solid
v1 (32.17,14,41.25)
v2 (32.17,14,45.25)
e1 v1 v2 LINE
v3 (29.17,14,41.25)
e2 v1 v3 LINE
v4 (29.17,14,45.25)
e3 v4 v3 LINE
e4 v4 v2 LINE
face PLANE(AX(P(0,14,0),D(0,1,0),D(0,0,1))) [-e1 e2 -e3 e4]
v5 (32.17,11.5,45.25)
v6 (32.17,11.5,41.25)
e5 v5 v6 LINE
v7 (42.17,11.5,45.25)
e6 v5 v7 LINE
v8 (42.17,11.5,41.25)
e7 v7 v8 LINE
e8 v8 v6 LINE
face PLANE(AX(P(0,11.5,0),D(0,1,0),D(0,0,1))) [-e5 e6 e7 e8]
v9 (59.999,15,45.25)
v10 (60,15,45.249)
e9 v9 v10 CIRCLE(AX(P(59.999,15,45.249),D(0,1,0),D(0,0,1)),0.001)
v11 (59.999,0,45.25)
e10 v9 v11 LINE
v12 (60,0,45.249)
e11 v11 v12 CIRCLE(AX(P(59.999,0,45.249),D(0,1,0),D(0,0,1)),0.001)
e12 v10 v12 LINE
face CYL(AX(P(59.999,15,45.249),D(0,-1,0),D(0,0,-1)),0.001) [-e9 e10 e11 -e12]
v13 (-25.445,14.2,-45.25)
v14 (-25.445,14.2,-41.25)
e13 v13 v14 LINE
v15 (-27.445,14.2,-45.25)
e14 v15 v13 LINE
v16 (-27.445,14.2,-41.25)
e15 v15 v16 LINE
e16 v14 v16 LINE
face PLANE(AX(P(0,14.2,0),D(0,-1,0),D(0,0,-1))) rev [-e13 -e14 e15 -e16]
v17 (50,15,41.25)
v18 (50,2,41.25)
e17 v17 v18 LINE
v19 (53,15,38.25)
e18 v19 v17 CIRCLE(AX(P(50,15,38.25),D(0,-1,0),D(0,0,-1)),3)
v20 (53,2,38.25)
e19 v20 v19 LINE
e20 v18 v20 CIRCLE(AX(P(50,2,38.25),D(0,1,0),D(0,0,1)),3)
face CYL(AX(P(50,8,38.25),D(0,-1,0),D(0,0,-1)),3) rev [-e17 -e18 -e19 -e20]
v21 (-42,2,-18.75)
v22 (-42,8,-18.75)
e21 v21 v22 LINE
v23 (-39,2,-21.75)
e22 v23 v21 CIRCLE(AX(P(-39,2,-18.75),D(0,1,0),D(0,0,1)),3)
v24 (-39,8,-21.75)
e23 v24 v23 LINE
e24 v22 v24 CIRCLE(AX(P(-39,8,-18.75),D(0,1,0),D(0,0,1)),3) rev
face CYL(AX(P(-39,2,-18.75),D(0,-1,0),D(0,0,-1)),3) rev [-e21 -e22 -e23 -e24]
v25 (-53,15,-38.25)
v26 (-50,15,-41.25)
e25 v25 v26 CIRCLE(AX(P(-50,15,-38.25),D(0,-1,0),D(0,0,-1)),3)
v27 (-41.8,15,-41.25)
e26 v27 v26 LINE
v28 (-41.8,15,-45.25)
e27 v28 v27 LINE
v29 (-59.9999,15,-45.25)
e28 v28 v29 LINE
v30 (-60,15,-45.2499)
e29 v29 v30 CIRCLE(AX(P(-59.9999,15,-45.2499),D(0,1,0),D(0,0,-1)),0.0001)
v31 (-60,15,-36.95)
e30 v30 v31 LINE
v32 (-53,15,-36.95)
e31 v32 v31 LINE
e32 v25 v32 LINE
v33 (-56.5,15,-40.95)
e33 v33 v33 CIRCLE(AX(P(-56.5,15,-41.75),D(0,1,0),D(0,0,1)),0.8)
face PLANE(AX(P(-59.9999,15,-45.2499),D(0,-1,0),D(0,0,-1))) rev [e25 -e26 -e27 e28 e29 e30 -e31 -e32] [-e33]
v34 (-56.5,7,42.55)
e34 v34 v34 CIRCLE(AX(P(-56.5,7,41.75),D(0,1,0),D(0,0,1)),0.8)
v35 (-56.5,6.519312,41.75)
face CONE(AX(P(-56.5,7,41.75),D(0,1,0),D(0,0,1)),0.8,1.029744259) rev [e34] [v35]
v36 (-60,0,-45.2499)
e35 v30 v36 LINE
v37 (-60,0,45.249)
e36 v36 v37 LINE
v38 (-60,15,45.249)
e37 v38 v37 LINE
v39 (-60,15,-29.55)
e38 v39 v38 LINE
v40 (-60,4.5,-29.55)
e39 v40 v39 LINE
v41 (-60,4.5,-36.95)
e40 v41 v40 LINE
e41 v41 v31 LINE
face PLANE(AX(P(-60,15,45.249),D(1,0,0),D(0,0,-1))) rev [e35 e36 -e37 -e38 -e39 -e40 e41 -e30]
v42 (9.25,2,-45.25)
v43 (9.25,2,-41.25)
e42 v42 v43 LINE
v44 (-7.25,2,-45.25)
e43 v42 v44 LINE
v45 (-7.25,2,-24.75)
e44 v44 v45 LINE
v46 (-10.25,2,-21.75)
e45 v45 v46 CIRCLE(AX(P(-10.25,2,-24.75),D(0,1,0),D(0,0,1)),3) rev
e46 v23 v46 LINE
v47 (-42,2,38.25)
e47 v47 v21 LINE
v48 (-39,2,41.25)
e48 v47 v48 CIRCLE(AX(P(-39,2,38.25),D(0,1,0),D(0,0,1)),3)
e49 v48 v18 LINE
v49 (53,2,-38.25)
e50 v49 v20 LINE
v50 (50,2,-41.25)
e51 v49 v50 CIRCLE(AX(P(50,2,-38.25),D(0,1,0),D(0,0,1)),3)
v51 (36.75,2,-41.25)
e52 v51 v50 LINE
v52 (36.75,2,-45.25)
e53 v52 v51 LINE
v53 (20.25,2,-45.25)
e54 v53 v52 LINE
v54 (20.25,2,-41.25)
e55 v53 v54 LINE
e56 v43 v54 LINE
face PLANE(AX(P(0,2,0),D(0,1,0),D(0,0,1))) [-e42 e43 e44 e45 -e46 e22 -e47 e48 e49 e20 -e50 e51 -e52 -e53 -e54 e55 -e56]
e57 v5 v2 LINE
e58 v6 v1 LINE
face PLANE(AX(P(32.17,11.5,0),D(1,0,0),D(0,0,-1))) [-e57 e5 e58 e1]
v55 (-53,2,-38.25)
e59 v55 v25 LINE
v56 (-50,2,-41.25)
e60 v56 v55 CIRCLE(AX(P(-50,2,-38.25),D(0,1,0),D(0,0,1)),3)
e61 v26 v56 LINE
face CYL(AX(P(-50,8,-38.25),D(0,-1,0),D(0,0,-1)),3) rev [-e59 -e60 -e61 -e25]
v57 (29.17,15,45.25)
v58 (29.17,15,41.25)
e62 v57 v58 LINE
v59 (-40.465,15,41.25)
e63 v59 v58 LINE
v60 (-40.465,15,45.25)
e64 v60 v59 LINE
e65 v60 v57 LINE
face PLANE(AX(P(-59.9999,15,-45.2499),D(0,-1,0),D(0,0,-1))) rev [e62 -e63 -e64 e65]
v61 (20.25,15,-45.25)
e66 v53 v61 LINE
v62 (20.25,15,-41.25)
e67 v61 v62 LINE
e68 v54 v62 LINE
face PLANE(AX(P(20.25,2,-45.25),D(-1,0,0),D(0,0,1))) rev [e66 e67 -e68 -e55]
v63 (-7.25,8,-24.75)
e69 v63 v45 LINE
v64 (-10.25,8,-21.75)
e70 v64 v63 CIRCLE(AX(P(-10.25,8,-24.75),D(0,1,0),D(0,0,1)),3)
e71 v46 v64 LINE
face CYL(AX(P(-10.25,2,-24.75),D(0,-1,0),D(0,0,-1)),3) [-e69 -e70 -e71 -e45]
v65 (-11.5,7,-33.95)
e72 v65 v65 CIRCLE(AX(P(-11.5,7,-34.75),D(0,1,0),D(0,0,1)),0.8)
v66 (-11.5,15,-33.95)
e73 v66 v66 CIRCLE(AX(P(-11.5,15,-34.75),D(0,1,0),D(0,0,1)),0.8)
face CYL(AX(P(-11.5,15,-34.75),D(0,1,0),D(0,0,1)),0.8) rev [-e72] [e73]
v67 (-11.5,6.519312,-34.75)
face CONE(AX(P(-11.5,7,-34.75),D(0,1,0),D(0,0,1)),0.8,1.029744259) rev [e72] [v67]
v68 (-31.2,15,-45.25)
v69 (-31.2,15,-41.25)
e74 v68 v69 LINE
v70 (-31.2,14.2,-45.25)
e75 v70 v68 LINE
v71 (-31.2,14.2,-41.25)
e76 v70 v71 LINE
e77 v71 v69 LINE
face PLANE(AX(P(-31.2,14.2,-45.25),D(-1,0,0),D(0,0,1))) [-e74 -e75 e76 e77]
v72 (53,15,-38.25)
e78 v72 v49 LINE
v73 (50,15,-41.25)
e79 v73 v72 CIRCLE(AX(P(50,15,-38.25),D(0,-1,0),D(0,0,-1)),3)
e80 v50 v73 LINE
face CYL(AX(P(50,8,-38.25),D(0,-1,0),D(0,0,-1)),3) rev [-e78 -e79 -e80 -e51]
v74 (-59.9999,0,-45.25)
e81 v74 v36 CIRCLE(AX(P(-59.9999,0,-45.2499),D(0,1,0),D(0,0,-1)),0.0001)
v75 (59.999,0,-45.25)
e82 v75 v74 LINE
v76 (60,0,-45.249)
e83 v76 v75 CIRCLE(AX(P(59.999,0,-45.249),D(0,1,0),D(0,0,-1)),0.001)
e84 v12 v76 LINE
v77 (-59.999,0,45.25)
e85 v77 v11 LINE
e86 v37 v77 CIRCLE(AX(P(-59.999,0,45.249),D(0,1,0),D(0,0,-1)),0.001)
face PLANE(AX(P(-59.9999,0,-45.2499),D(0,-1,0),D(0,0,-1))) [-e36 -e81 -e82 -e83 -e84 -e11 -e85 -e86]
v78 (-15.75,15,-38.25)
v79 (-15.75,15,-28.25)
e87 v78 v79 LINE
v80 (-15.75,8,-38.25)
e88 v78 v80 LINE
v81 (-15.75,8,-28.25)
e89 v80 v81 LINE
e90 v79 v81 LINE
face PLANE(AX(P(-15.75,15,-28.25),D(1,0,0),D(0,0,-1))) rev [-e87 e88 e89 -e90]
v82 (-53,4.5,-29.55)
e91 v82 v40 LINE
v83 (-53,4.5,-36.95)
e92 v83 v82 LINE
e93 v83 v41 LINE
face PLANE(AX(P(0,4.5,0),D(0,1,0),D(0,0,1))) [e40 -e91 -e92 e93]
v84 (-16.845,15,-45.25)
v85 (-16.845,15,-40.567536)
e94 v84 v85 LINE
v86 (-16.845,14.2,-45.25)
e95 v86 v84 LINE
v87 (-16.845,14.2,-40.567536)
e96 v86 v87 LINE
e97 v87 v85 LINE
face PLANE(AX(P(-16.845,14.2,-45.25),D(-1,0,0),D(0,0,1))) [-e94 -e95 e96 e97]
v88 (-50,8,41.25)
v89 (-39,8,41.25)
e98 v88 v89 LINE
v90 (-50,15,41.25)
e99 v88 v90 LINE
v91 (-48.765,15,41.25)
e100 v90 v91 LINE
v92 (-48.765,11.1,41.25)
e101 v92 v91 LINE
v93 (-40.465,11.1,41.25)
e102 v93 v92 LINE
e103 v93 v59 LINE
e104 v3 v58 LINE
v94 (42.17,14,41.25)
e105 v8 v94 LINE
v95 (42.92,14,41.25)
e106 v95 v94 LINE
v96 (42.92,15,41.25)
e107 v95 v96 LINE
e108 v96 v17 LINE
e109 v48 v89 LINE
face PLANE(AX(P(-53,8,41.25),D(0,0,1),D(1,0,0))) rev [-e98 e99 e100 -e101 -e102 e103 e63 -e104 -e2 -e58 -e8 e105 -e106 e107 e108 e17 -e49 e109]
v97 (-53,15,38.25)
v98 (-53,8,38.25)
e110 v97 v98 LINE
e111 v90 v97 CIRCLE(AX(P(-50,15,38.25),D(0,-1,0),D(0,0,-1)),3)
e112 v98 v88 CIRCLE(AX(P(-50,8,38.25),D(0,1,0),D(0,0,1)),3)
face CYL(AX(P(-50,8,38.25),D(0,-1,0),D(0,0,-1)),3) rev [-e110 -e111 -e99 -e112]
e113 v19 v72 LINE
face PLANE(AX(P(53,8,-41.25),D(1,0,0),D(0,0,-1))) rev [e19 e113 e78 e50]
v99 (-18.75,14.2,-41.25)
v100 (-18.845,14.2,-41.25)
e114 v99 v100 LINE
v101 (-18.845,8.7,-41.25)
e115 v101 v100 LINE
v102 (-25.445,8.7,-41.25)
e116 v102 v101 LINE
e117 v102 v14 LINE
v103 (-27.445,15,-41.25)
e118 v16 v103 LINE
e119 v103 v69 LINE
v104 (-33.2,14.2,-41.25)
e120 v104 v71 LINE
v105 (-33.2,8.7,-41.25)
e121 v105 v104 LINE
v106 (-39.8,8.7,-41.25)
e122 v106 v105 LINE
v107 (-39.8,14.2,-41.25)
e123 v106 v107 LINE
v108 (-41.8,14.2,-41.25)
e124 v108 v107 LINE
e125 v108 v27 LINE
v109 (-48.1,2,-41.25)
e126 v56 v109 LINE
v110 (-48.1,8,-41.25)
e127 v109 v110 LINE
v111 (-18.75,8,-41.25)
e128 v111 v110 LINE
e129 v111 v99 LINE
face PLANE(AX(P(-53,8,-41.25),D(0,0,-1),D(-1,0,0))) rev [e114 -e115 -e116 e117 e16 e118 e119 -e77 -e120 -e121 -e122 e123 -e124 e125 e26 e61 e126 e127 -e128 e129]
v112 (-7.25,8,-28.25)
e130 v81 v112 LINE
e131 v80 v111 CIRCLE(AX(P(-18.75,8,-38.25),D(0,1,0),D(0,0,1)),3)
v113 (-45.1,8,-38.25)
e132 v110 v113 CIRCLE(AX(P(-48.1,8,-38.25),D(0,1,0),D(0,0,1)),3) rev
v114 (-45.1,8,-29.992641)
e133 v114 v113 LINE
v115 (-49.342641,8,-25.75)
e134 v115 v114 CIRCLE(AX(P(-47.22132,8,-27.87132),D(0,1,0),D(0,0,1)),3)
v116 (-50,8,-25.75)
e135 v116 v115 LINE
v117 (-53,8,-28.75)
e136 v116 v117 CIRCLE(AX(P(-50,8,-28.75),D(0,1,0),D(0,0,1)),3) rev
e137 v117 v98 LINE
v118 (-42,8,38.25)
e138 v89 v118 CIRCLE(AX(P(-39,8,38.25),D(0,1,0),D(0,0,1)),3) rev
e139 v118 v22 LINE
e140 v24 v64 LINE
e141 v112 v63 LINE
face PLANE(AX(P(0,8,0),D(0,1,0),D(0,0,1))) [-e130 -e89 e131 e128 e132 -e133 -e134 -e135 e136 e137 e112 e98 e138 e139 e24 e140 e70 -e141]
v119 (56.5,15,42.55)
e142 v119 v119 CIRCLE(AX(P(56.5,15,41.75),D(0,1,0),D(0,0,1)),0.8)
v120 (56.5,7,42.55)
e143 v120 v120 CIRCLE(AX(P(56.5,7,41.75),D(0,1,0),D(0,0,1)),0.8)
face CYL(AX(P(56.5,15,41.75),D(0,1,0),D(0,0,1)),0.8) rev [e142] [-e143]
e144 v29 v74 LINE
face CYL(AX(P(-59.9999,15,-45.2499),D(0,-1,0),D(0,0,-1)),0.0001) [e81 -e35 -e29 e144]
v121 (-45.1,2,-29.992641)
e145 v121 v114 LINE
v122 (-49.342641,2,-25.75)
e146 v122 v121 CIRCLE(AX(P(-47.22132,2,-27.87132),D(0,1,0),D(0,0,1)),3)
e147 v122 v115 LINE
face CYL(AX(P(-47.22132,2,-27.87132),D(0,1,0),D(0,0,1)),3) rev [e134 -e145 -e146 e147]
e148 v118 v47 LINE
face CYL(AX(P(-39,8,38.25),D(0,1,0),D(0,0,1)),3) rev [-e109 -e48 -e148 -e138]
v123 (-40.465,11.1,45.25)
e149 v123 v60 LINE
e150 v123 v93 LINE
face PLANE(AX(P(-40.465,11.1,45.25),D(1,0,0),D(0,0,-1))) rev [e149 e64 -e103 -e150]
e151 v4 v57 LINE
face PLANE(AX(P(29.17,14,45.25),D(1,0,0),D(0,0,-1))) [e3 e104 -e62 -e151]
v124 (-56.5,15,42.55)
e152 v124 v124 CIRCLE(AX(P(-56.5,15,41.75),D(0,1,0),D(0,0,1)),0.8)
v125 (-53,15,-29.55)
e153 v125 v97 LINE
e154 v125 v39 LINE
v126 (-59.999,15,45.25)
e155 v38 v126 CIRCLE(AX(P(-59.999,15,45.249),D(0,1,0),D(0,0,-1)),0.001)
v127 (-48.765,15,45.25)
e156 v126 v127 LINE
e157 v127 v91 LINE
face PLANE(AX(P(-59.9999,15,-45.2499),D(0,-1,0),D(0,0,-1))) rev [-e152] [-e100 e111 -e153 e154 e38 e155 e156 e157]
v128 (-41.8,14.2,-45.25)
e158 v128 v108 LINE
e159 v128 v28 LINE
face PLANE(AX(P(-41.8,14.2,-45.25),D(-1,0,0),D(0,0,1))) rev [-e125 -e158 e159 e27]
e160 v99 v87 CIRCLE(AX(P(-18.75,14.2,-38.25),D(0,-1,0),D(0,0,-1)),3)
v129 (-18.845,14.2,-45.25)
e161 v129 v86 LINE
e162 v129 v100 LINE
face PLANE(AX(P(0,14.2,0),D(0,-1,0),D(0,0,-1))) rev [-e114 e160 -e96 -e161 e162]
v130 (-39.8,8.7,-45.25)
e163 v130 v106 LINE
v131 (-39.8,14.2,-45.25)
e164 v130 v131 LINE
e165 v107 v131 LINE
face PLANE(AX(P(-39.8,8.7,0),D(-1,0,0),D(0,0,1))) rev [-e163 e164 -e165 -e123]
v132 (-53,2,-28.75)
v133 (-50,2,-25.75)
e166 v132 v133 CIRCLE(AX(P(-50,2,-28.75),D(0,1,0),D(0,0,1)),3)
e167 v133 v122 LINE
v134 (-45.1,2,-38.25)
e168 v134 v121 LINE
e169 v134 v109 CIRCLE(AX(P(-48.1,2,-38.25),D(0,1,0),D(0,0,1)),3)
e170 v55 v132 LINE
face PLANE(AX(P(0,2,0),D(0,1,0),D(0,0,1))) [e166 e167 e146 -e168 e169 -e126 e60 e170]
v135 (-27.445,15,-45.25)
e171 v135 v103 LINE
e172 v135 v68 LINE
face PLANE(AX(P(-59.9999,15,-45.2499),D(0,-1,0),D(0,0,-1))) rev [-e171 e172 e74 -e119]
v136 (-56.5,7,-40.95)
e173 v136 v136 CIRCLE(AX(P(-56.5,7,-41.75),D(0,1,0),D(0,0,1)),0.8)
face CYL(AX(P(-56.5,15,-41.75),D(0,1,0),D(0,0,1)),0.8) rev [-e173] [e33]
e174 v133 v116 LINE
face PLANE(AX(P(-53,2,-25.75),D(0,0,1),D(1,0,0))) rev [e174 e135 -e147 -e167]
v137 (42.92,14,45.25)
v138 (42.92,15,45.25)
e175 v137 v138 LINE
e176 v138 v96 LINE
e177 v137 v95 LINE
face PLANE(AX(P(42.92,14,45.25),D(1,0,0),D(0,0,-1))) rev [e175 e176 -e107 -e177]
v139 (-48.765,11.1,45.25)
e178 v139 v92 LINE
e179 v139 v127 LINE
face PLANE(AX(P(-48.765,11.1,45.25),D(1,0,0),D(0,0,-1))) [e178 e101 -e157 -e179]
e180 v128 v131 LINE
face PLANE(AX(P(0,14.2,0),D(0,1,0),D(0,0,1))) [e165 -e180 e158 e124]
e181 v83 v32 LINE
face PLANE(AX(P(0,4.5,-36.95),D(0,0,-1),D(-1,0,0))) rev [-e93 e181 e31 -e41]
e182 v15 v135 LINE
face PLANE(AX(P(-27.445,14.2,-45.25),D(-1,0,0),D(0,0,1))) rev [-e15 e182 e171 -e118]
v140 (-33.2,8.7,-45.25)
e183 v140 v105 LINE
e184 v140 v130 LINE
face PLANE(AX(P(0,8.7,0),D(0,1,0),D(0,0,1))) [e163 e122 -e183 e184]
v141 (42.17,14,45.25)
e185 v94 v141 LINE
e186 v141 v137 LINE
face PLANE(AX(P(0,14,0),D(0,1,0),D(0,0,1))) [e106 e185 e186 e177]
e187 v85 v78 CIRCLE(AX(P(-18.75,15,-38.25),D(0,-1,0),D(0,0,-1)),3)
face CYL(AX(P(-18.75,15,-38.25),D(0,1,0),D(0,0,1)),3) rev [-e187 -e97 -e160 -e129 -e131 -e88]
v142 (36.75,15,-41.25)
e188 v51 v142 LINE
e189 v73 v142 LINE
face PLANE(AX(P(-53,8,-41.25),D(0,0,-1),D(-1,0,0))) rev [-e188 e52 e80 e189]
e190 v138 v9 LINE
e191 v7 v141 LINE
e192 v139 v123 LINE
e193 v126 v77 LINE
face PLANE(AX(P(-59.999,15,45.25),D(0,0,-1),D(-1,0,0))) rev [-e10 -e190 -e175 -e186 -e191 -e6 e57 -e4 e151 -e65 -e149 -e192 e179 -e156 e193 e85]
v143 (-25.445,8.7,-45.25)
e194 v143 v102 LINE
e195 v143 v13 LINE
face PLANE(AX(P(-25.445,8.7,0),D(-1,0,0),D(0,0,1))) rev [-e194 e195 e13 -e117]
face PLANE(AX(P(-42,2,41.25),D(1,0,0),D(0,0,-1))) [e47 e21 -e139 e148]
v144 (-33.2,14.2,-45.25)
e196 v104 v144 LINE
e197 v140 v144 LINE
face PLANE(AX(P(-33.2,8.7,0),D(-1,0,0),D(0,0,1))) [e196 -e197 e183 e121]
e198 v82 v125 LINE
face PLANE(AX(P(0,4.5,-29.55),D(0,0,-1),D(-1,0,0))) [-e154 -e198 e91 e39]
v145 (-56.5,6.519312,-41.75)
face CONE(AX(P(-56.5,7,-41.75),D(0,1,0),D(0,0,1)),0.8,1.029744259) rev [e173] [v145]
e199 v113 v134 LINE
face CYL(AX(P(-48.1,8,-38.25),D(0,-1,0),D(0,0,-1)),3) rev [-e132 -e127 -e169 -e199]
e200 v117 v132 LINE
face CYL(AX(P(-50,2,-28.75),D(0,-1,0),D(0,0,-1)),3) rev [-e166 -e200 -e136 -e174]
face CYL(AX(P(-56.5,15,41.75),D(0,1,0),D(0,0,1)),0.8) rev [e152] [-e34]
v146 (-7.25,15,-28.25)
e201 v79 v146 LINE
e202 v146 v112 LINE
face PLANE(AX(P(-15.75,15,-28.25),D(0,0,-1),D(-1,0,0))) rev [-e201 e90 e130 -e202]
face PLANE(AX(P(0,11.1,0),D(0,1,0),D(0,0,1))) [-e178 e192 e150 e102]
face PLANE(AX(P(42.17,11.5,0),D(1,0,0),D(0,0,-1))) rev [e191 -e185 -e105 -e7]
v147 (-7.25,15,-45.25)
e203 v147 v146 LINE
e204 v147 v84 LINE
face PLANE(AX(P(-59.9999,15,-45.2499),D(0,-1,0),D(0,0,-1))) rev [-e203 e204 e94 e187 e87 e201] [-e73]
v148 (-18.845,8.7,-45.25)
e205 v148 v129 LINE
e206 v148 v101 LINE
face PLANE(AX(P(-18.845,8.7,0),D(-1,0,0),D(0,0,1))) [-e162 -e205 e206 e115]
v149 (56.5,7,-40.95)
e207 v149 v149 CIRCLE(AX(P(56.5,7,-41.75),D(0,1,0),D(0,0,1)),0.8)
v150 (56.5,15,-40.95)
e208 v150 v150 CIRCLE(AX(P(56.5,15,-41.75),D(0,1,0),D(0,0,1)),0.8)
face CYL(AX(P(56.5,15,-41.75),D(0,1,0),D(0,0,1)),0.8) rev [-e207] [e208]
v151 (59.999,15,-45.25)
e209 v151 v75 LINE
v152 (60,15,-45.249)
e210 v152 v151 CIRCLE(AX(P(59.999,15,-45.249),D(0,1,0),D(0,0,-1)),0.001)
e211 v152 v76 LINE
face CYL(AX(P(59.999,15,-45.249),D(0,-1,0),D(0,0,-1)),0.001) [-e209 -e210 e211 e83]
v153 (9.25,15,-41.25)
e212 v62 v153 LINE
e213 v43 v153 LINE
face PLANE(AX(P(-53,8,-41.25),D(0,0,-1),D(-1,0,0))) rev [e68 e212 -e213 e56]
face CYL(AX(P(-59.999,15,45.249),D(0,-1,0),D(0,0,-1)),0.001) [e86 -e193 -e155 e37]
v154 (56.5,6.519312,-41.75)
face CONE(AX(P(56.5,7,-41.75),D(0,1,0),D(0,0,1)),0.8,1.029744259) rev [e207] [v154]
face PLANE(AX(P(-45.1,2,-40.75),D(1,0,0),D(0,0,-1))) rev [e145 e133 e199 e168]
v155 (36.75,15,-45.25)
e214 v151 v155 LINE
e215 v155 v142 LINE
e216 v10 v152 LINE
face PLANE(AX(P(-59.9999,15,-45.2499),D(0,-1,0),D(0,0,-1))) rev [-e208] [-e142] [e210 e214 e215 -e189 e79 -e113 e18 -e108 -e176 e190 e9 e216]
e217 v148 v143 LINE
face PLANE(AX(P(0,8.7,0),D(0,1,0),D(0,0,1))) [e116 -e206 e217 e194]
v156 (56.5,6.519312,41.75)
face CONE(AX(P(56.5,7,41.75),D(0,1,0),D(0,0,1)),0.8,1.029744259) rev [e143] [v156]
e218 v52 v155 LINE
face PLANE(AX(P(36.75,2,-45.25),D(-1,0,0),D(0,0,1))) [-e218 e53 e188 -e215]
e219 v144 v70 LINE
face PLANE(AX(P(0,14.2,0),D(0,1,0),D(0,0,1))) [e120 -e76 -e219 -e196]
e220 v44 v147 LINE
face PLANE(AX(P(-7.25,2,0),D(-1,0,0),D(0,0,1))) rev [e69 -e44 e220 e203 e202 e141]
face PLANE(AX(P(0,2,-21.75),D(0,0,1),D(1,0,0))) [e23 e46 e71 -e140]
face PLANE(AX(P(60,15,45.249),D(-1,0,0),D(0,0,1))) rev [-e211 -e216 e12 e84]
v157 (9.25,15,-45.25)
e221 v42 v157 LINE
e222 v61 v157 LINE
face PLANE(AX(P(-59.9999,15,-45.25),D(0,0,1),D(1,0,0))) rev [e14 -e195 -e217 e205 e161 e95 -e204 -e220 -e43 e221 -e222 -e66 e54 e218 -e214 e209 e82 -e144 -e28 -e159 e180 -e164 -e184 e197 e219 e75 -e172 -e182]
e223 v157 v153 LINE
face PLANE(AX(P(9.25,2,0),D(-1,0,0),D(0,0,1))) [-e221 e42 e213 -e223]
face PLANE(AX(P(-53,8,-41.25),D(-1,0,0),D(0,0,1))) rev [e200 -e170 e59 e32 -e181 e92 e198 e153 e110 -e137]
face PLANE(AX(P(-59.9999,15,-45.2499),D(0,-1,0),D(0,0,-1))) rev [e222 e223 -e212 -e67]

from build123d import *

# Parameters (mm, degrees)
SKETCH_1_R                  = 0.0001
EXTRUDE_3486_DEPTH          = 15
SKETCH_3_W                  = 106
SKETCH_3_H                  = 82.5
CUT_EXTRUDE_5664_DEPTH      = 7
PHONEJACK_CENTER_DEPTH      = 6.3
SKETCH_2_10_W               = 10.6
SKETCH_2_10_H               = 13.1
PHONEJACK_PADS_DEPTH        = 0.8
MICJACK_START               = -13
MICJACK_DEPTH               = 13
ENCODER_BODY_DEPTH          = 13
SKETCH_2_13_W               = 7
SKETCH_2_13_H               = 7.4
ENCODER_SHAFT_DEPTH         = 10.5
SKETCH_2_14_W               = 8.3
SKETCH_2_14_H               = 5
SW_DEPTH                    = 3.9
USB_DEPTH                   = 3.5
SKETCH_2_16_W               = 11.5
SKETCH_2_16_H               = 8
SKETCH_2_16_W_2             = 3
USB_PADS_DEPTH              = 1
HOLE_WIZARD_8269_D          = 1.6
HOLE_WIZARD_8269_DEPTH      = 8
HOLE_WIZARD_8269_TIP        = 0.480688495
SKETCH_15_W                 = 8.5
SKETCH_15_H                 = 13
EXTRUDE_11487_DEPTH         = 7
HOLE_WIZARD_1_6_1_6_1_D     = 1.6
HOLE_WIZARD_1_6_1_6_1_DEPTH = 8
HOLE_WIZARD_1_6_1_6_1_TIP   = 0.480688495
CUT_EXTRUDE_START           = -13
CUT_EXTRUDE_12334_DEPTH     = 13
CUT_EXTRUDE_12754_DEPTH     = 13
FILLET_2_R                  = 3


# Read off the part's stored shape, not the designer's step: micjack
with BuildPart() as part:
    # 草图1 → Extrude 3486 (new body)
    with BuildSketch(Plane(origin=(0, 0, 0), x_dir=(1, 0, 0), z_dir=(0, 1, 0))):
        with Locations((-59.9999, 45.2499)):
            Circle(SKETCH_1_R)
        with BuildLine():
            Line((-59.999, -45.25), (59.999, -45.25))
            ThreePointArc((59.999, -45.25), (59.999707107, -45.249707107), (60, -45.249))
            Line((60, -45.249), (60, 45.249))
            ThreePointArc((60, 45.249), (59.999707107, 45.249707107), (59.999, 45.25))
            Line((59.999, 45.25), (-60, 45.2499))
            Line((-60, 45.2499), (-60, -45.249))
            ThreePointArc((-60, -45.249), (-59.999707107, -45.249707107), (-59.999, -45.25))
        make_face()
    extrude(amount=EXTRUDE_3486_DEPTH)

    # 草图3 → Cut-Extrude 5664 (cut)
    with BuildSketch(Plane(origin=(0, 15, 0), x_dir=(1, 0, 0), z_dir=(0, 1, 0))):
        Rectangle(SKETCH_3_W, SKETCH_3_H)
    extrude(amount=-CUT_EXTRUDE_5664_DEPTH, mode=Mode.SUBTRACT)

    # 草图2 → phonejack_center (cut)
    with BuildSketch(Plane(origin=(0, 15, 0), x_dir=(1, 0, 0), z_dir=(0, 1, 0))):
        Polygon((-18.845, 45.25), (-25.445, 45.25), (-25.445, 34.892640687), (-25.445, 32.15), (-18.845, 32.15), (-18.845, 34.892640687), align=None)
        with BuildLine():
            Line((-25.445, 32.15), (-25.445, 34.892640687))
            ThreePointArc((-25.445, 34.892640687), (-26.199788077, 33.62454971), (-26.258634687, 32.15))
            Line((-26.258634687, 32.15), (-25.445, 32.15))
        make_face()
        with BuildLine():
            Line((-25.445, 32.15), (-26.258634687, 32.15))
            ThreePointArc((-26.258634687, 32.15), (-25.960719695, 31.340928846), (-25.445, 30.65))
            Line((-25.445, 30.65), (-25.445, 32.15))
        make_face()
        with BuildLine():
            Line((-23.087640687, 30.65), (-25.445, 30.65))
            ThreePointArc((-25.445, 30.65), (-23.892646037, 29.825768229), (-22.145, 30.012568041))
            ThreePointArc((-22.145, 30.012568041), (-22.646820232, 30.286180483), (-23.087640687, 30.65))
        make_face()
        with BuildLine():
            Line((-21.202359313, 30.65), (-23.087640687, 30.65))
            ThreePointArc((-23.087640687, 30.65), (-22.646820232, 30.286180483), (-22.145, 30.012568041))
            ThreePointArc((-22.145, 30.012568041), (-21.643179768, 30.286180483), (-21.202359313, 30.65))
        make_face()
        with BuildLine():
            ThreePointArc((-21.202359313, 30.65), (-21.643179768, 30.286180483), (-22.145, 30.012568041))
            ThreePointArc((-22.145, 30.012568041), (-20.397353963, 29.825768229), (-18.845, 30.65))
            Line((-18.845, 30.65), (-21.202359313, 30.65))
        make_face()
        with BuildLine():
            ThreePointArc((-18.031365313, 32.15), (-18.090211923, 33.62454971), (-18.845, 34.892640687))
            Line((-18.845, 34.892640687), (-18.845, 32.15))
            Line((-18.845, 32.15), (-18.031365313, 32.15))
        make_face()
        with BuildLine():
            Line((-18.031365313, 32.15), (-18.845, 32.15))
            Line((-18.845, 32.15), (-18.845, 30.65))
            ThreePointArc((-18.845, 30.65), (-18.329280305, 31.340928846), (-18.031365313, 32.15))
        make_face()
        Polygon((-18.845, 32.15), (-25.445, 32.15), (-25.445, 30.65), (-23.087640687, 30.65), (-21.202359313, 30.65), (-18.845, 30.65), align=None)
        Polygon((-33.2, 45.25), (-39.8, 45.25), (-39.8, 34.892640687), (-39.8, 32.15), (-33.2, 32.15), (-33.2, 34.892640687), align=None)
        with BuildLine():
            Line((-39.8, 32.15), (-39.8, 34.892640687))
            ThreePointArc((-39.8, 34.892640687), (-40.554788077, 33.62454971), (-40.613634687, 32.15))
            Line((-40.613634687, 32.15), (-39.8, 32.15))
        make_face()
        with BuildLine():
            Line((-39.8, 30.65), (-39.8, 32.15))
            Line((-39.8, 32.15), (-40.613634687, 32.15))
            ThreePointArc((-40.613634687, 32.15), (-40.315719695, 31.340928846), (-39.8, 30.65))
        make_face()
        with BuildLine():
            Line((-37.442640687, 30.65), (-39.8, 30.65))
            ThreePointArc((-39.8, 30.65), (-38.247646037, 29.825768229), (-36.5, 30.012568041))
            ThreePointArc((-36.5, 30.012568041), (-37.001820232, 30.286180483), (-37.442640687, 30.65))
        make_face()
        with BuildLine():
            ThreePointArc((-36.5, 30.012568041), (-34.752353963, 29.825768229), (-33.2, 30.65))
            Line((-33.2, 30.65), (-35.557359313, 30.65))
            ThreePointArc((-35.557359313, 30.65), (-35.998179768, 30.286180483), (-36.5, 30.012568041))
        make_face()
        with BuildLine():
            Line((-35.557359313, 30.65), (-37.442640687, 30.65))
            ThreePointArc((-37.442640687, 30.65), (-37.001820232, 30.286180483), (-36.5, 30.012568041))
            ThreePointArc((-36.5, 30.012568041), (-35.998179768, 30.286180483), (-35.557359313, 30.65))
        make_face()
        Polygon((-33.2, 32.15), (-39.8, 32.15), (-39.8, 30.65), (-37.442640687, 30.65), (-35.557359313, 30.65), (-33.2, 30.65), align=None)
        with BuildLine():
            ThreePointArc((-32.386365313, 32.15), (-32.445211923, 33.62454971), (-33.2, 34.892640687))
            Line((-33.2, 34.892640687), (-33.2, 32.15))
            Line((-33.2, 32.15), (-32.386365313, 32.15))
        make_face()
        with BuildLine():
            Line((-32.386365313, 32.15), (-33.2, 32.15))
            Line((-33.2, 32.15), (-33.2, 30.65))
            ThreePointArc((-33.2, 30.65), (-32.684280305, 31.340928846), (-32.386365313, 32.15))
        make_face()
    extrude(amount=-PHONEJACK_CENTER_DEPTH, mode=Mode.SUBTRACT)

    # 草图2<10> → phonejack_pads (cut)
    with BuildSketch(Plane(origin=(0, 15, 0), x_dir=(1, 0, 0), z_dir=(0, 1, 0))):
        with Locations((-36.5, 38.7)):
            Rectangle(SKETCH_2_10_W, SKETCH_2_10_H)
        with Locations((-22.145, 38.7)):
            Rectangle(SKETCH_2_10_W, SKETCH_2_10_H)
    extrude(amount=-PHONEJACK_PADS_DEPTH, mode=Mode.SUBTRACT)

    # micjack outline → micjack (cut)
    with BuildSketch(Plane(origin=(0, 15, 0), x_dir=(1, 0, 0), z_dir=(0, 1, 0)).offset(MICJACK_START)):
        with BuildLine():
            Line((53, 21.75), (53, 41.25))
            Line((53, 41.25), (36.75, 41.25))
            Line((36.75, 41.25), (36.75, 45.25))
            Line((36.75, 45.25), (20.25, 45.25))
            Line((20.25, 45.25), (20.25, 23.492640687))
            ThreePointArc((20.25, 23.492640687), (20.25, 19.25), (24.492640687, 19.25))
            Line((24.492640687, 19.25), (33.921572875, 19.25))
            ThreePointArc((33.921572875, 19.25), (36.592809886, 19.108613341), (37.015389906, 21.75))
            Line((37.015389906, 21.75), (53, 21.75))
        make_face()
        with BuildLine():
            Line((-7.25, 45.25), (-7.25, 21.75))
            Line((-7.25, 21.75), (-8.104683977, 21.75))
            ThreePointArc((-8.104683977, 21.75), (-6.449710003, 18.677832117), (-3.007359313, 19.25))
            Line((-3.007359313, 19.25), (5.007359313, 19.25))
            ThreePointArc((5.007359313, 19.25), (9.25, 19.25), (9.25, 23.492640687))
            Line((9.25, 23.492640687), (9.25, 45.25))
            Line((9.25, 45.25), (-7.25, 45.25))
        make_face()
    extrude(amount=MICJACK_DEPTH, mode=Mode.SUBTRACT)

    # 草图2<12> → encoder_body (cut)
    with BuildSketch(Plane(origin=(0, 15, 0), x_dir=(1, 0, 0), z_dir=(0, 1, 0))):
        with BuildLine():
            Line((-53, 41.25), (-53, 25.75))
            Line((-53, 25.75), (-49.342640687, 25.75))
            ThreePointArc((-49.342640687, 25.75), (-45.1, 25.75), (-45.1, 29.992640687))
            Line((-45.1, 29.992640687), (-45.1, 41.25))
            Line((-45.1, 41.25), (-53, 41.25))
        make_face()
    extrude(amount=-ENCODER_BODY_DEPTH, mode=Mode.SUBTRACT)

    # 草图2<13> → encoder_shaft (cut)
    with BuildSketch(Plane(origin=(0, 15, 0), x_dir=(1, 0, 0), z_dir=(0, 1, 0))):
        with Locations((-56.5, 33.25)):
            Rectangle(SKETCH_2_13_W, SKETCH_2_13_H)
    extrude(amount=-ENCODER_SHAFT_DEPTH, mode=Mode.SUBTRACT)

    # 草图2<14> → sw (cut)
    with BuildSketch(Plane(origin=(0, 15, 0), x_dir=(1, 0, 0), z_dir=(0, 1, 0))):
        with Locations((-44.615, -42.75)):
            Rectangle(SKETCH_2_14_W, SKETCH_2_14_H)
    extrude(amount=-SW_DEPTH, mode=Mode.SUBTRACT)

    # 草图2<15> → USB (cut)
    with BuildSketch(Plane(origin=(0, 15, 0), x_dir=(1, 0, 0), z_dir=(0, 1, 0))):
        Polygon((32.17, -41.492640687), (32.17, -45.25), (42.17, -45.25), (42.17, -41.492640687), (42.17, -41.25), (32.17, -41.25), align=None)
    extrude(amount=-USB_DEPTH, mode=Mode.SUBTRACT)

    # 草图2<16> → USB_pads (cut)
    with BuildSketch(Plane(origin=(0, 15, 0), x_dir=(1, 0, 0), z_dir=(0, 1, 0))):
        with Locations((37.17, -41.25)):
            Rectangle(SKETCH_2_16_W, SKETCH_2_16_H)
        with Locations((30.67, -41.25)):
            Rectangle(SKETCH_2_16_W_2, SKETCH_2_16_H)
    extrude(amount=-USB_PADS_DEPTH, mode=Mode.SUBTRACT)

    # Hole Wizard 8269
    with Locations(Plane(origin=(0, 15, 0), x_dir=(1, 0, 0), z_dir=(0, 1, 0))):
        with Locations((56.5, -41.75), (56.5, 41.75), (-56.5, 41.75), (-56.5, -41.75)):
            Hole(HOLE_WIZARD_8269_D / 2, depth=HOLE_WIZARD_8269_DEPTH)
            with Locations((0, 0, -(HOLE_WIZARD_8269_DEPTH + HOLE_WIZARD_8269_TIP / 2))):  # 118° drill point
                Cone(0, HOLE_WIZARD_8269_D / 2, HOLE_WIZARD_8269_TIP, mode=Mode.SUBTRACT)

    # 草图15 → Extrude 11487 (add)
    with BuildSketch(Plane(origin=(0, 8, 0), x_dir=(1, 0, 0), z_dir=(0, 1, 0))):
        with Locations((-11.5, 34.75)):
            Rectangle(SKETCH_15_W, SKETCH_15_H)
    extrude(amount=EXTRUDE_11487_DEPTH)

    # Ø1.6 (1.6) 直径孔1
    with Locations(Plane(origin=(0, 15, 0), x_dir=(1, 0, 0), z_dir=(0, 1, 0))):
        with Locations((-11.5, 34.75)):
            Hole(HOLE_WIZARD_1_6_1_6_1_D / 2, depth=HOLE_WIZARD_1_6_1_6_1_DEPTH)
            with Locations((0, 0, -(HOLE_WIZARD_1_6_1_6_1_DEPTH + HOLE_WIZARD_1_6_1_6_1_TIP / 2))):  # 118° drill point
                Cone(0, HOLE_WIZARD_1_6_1_6_1_D / 2, HOLE_WIZARD_1_6_1_6_1_TIP, mode=Mode.SUBTRACT)

    # 草图2<18> → Cut-Extrude 12334 (cut)
    with BuildSketch(Plane(origin=(0, 15, 0), x_dir=(1, 0, 0), z_dir=(0, 1, 0)).offset(CUT_EXTRUDE_START)):
        with BuildLine():
            Line((53, -41.25), (53, 21.75))
            Line((53, 21.75), (37.015389906, 21.75))
            ThreePointArc((37.015389906, 21.75), (36.592809886, 19.108613341), (33.921572875, 19.25))
            Line((33.921572875, 19.25), (24.492640687, 19.25))
            ThreePointArc((24.492640687, 19.25), (21.050289997, 18.677832117), (19.395316023, 21.75))
            Line((19.395316023, 21.75), (10.104683977, 21.75))
            ThreePointArc((10.104683977, 21.75), (8.449710003, 18.677832117), (5.007359313, 19.25))
            Line((5.007359313, 19.25), (-3.007359313, 19.25))
            ThreePointArc((-3.007359313, 19.25), (-6.449710003, 18.677832117), (-8.104683977, 21.75))
            Line((-8.104683977, 21.75), (-42, 21.75))
            Line((-42, 21.75), (-42, -41.25))
            Line((-42, -41.25), (53, -41.25))
        make_face()
    extrude(amount=CUT_EXTRUDE_12334_DEPTH, mode=Mode.SUBTRACT)

    # 草图2<20> → Cut-Extrude 12754 (cut)
    with BuildSketch(Plane(origin=(0, 15, 0), x_dir=(1, 0, 0), z_dir=(0, 1, 0)).offset(CUT_EXTRUDE_START)):
        with BuildLine():
            ThreePointArc((19.395316023, 21.75), (19.677832117, 22.69235069), (20.25, 23.492640687))
            Line((20.25, 23.492640687), (20.25, 41.25))
            Line((20.25, 41.25), (9.25, 41.25))
            Line((9.25, 41.25), (9.25, 23.492640687))
            ThreePointArc((9.25, 23.492640687), (9.822167883, 22.69235069), (10.104683977, 21.75))
            Line((10.104683977, 21.75), (19.395316023, 21.75))
        make_face()
    extrude(amount=CUT_EXTRUDE_12754_DEPTH, mode=Mode.SUBTRACT)

    # 圆角2
    fillet_2_edges = [part.edges().sort_by_distance(p)[0] for p in [
        (-7.25, 5, -21.75),
        (53, 8.5, -41.25),
        (53, 8.5, 41.25),
        (-53, 5, -25.75),
        (-42, 5, -21.75),
        (-42, 5, 41.25),
        (-53, 11.5, 41.25),
        (-53, 8.5, -41.25),
        (-15.75, 11.5, -41.25),
        (-45.1, 5, -41.25),
    ]]
    fillet(fillet_2_edges, radius=FILLET_2_R)


solid = part.part
